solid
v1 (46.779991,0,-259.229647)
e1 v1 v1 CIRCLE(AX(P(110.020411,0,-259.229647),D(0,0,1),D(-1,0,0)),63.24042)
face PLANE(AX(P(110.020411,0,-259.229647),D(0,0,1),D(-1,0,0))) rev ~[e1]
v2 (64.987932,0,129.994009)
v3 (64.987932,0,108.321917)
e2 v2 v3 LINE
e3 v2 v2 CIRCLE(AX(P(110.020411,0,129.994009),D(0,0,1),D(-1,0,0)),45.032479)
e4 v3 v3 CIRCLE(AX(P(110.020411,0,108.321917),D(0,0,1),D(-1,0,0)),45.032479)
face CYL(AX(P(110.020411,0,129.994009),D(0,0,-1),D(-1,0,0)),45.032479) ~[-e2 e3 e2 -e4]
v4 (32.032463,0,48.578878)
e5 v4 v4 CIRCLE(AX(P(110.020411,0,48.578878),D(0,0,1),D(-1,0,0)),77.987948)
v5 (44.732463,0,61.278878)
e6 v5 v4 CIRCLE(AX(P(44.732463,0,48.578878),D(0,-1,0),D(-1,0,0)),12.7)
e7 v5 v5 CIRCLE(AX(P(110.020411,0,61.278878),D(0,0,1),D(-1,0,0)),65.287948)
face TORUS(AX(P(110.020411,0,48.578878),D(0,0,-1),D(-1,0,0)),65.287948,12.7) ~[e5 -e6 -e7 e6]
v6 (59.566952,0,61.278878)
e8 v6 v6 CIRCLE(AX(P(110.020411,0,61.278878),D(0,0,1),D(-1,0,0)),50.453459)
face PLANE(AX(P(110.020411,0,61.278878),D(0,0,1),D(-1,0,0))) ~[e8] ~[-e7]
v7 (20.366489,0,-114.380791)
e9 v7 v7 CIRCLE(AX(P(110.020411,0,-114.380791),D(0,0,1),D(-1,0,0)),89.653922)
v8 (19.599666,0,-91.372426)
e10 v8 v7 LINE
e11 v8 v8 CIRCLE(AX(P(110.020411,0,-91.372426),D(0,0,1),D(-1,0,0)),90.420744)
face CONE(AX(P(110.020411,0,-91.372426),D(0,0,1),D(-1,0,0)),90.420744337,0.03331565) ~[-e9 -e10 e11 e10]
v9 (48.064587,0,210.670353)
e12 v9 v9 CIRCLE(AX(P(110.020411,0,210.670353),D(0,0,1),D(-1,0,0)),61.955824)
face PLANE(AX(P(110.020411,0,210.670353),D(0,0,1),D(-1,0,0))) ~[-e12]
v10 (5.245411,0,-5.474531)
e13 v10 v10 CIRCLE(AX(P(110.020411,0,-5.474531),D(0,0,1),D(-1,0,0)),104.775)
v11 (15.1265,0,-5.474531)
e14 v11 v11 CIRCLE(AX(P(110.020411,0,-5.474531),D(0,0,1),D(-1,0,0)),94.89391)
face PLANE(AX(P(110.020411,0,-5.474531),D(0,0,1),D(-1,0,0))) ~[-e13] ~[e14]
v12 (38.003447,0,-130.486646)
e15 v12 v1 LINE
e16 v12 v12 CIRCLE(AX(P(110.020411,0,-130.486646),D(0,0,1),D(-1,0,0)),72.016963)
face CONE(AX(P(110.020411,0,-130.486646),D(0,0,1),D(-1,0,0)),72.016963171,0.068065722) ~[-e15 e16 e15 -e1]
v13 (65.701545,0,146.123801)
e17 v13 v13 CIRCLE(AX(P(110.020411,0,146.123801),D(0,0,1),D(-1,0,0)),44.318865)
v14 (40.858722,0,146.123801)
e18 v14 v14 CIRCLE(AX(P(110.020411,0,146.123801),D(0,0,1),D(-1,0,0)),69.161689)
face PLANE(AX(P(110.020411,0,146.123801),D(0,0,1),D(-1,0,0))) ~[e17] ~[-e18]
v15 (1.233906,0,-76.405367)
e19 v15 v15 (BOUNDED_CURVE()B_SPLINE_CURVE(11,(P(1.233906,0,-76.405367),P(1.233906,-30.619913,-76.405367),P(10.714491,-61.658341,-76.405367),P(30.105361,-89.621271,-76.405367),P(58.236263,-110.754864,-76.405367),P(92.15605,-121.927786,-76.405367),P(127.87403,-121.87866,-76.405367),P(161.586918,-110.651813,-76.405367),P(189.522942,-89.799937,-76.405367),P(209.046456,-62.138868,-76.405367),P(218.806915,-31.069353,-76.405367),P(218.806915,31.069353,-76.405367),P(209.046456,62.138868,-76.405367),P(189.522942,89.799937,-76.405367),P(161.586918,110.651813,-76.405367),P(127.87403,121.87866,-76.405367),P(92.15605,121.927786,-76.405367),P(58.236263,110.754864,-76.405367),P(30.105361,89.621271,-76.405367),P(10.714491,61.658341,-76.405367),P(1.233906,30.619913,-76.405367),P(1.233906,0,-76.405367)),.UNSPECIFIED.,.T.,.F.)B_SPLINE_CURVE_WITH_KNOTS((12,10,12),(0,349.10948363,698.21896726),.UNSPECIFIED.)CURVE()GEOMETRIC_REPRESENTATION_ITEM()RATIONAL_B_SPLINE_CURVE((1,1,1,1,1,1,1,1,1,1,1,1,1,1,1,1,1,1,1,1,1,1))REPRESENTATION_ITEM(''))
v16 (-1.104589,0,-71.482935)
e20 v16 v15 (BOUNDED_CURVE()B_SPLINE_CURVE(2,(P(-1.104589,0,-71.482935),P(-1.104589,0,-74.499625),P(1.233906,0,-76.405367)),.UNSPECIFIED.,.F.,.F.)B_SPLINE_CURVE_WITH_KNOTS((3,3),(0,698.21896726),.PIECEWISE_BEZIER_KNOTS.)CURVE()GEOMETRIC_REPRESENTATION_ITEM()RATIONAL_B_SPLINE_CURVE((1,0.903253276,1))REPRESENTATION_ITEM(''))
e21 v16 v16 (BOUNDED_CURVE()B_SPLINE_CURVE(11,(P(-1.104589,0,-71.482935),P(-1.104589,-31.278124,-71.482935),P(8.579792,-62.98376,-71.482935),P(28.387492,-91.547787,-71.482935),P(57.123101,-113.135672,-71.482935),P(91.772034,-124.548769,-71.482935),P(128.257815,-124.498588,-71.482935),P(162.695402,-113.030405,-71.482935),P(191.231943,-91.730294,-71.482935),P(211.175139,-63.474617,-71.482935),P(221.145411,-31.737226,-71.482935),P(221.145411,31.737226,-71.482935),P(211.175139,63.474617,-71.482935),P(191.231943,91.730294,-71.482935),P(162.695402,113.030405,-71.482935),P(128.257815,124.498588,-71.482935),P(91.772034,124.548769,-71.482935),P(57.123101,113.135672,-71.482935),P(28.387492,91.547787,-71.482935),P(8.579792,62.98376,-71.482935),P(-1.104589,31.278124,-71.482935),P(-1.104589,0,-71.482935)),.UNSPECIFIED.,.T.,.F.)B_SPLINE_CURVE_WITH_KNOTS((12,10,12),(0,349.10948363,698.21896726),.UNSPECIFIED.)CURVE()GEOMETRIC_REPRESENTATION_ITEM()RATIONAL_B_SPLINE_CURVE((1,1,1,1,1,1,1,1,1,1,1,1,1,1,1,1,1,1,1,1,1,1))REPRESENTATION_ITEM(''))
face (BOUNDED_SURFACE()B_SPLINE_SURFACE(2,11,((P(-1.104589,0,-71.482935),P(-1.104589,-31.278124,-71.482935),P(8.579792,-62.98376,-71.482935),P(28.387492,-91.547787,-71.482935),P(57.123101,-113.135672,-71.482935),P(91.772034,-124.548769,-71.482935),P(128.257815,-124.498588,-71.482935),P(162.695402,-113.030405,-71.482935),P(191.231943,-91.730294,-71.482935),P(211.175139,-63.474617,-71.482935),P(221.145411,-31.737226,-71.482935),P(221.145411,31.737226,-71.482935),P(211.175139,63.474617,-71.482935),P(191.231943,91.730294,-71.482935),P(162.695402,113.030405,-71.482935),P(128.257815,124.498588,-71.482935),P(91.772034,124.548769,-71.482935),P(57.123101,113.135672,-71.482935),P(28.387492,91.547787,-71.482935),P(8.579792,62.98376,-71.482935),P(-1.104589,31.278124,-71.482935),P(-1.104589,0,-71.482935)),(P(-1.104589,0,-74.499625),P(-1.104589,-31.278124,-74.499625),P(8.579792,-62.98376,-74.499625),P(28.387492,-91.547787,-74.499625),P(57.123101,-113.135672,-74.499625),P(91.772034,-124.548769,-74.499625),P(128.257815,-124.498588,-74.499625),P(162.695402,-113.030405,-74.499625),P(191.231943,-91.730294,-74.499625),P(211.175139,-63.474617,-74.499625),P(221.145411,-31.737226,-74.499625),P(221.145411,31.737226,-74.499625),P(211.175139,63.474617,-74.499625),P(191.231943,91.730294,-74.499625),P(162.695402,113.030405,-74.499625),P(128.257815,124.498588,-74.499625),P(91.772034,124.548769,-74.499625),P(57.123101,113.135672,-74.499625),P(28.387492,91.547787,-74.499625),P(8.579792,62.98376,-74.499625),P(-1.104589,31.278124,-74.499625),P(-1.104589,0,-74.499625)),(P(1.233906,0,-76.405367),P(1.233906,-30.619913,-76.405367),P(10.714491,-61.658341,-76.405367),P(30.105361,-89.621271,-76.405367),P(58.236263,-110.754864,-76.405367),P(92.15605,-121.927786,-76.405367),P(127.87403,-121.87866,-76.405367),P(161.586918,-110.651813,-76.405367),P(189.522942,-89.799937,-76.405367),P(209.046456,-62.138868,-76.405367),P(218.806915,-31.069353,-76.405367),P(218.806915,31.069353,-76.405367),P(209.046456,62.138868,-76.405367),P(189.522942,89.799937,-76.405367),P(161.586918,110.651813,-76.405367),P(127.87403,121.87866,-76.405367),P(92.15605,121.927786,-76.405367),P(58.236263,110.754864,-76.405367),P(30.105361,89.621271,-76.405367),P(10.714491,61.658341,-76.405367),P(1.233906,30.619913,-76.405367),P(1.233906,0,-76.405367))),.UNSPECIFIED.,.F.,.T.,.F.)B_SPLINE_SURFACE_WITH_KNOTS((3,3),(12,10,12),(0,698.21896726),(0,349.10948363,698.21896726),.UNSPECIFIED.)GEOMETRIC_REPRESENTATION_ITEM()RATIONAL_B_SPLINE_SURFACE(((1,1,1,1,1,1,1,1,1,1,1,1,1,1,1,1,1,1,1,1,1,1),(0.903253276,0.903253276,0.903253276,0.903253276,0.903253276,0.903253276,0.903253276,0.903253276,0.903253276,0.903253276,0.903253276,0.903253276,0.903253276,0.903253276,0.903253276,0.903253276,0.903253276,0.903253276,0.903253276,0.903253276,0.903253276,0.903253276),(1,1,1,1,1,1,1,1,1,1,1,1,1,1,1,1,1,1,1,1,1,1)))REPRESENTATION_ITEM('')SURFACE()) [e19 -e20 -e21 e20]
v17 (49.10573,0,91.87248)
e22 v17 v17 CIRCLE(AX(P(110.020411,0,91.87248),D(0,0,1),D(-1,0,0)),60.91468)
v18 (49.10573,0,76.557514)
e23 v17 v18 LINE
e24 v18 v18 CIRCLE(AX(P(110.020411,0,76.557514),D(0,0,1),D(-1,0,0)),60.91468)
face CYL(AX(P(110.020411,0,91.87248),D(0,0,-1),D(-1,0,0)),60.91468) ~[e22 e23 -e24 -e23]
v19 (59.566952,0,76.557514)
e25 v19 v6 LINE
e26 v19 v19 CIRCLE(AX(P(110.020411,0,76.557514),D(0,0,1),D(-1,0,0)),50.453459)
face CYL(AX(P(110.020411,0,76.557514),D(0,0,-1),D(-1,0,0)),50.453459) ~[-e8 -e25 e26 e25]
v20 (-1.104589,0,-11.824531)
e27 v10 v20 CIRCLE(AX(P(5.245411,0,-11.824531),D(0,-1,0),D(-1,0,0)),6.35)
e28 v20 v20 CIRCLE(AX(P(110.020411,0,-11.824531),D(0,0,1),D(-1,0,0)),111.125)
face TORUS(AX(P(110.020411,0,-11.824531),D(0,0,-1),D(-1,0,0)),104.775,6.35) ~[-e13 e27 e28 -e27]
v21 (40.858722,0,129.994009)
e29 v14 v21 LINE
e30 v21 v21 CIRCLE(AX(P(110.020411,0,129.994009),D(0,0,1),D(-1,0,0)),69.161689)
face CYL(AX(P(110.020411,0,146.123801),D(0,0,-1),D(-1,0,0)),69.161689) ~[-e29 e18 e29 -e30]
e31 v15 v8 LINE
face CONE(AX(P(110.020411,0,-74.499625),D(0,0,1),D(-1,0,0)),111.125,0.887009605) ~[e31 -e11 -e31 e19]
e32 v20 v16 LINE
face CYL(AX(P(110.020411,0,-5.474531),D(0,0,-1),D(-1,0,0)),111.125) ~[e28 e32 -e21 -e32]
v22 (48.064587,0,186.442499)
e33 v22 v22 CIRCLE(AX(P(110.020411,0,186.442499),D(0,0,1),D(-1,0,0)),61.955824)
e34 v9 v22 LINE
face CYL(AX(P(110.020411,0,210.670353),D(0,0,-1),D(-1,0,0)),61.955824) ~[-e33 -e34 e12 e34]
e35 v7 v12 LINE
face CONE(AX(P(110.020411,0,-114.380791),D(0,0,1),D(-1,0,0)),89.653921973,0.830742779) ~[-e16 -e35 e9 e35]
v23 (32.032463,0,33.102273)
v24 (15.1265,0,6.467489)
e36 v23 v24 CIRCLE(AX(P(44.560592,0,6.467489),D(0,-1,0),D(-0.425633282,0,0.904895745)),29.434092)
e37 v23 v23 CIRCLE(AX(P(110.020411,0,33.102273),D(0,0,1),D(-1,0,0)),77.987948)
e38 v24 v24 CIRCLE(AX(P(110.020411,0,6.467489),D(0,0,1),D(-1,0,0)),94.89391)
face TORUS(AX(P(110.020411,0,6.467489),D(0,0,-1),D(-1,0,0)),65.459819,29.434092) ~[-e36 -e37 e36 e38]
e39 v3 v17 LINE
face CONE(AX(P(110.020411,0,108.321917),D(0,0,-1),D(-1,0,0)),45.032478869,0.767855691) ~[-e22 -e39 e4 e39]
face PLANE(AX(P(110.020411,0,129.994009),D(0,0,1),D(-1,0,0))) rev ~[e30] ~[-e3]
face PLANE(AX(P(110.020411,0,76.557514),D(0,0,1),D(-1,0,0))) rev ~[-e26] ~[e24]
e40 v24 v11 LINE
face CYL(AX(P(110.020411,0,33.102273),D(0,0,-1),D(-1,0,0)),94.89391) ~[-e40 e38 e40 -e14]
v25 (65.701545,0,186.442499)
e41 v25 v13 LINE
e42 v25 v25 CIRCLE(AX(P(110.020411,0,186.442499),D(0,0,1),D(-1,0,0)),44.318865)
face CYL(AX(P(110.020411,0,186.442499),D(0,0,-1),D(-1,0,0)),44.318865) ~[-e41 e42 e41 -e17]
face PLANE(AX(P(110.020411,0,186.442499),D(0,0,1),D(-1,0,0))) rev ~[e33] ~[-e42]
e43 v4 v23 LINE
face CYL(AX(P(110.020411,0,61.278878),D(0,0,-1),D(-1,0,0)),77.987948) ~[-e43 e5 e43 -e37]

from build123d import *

# Parameters (mm, degrees)
F2_R = 12.7
F4_R = 6.35


# Not quite as in the source:
# - a fillet or chamfer that OpenCascade refuses, or shapes differently, is made with other operations: its cross-section is extruded or revolved along the edge and cut away or added


with BuildPart() as f1:
    # F0 (on Front) → F1 (revolve)
    with BuildSketch(Plane.XZ):
        Polygon((46.7799907497, -259.2296465031), (110.0204106454, -259.2296465031), (110.0204106454, 210.6703534969), (48.0645865742, 210.6703534969), (48.0645865742, 186.4424991518), (65.7015453758, 186.4424991518), (65.7015453758, 146.1238006124), (40.8587217282, 146.1238006124), (40.8587217282, 129.9940093533), (64.9879317765, 129.9940093533), (64.9879317765, 108.3219168065), (49.1057302837, 91.8724802611), (49.1057302837, 76.5575138209), (59.5669516537, 76.5575138209), (59.5669516537, 61.2788777338), (32.0324628472, 61.2788777338), (32.0324628472, 33.1022732576), (15.1265001614, 33.1022732576), (15.1265001614, -5.4745311297), (-1.1045893546, -5.4745311297), (-1.1045893546, -74.4996249259), (19.5996663081, -91.3724261251), (20.3664886729, -114.3807911865), (38.0034474745, -130.4866455729), align=None)
    revolve(axis=Axis((110.0204106454, 0, -24.2796465031), (0, 0, 1)))

    # F2
    f2_edges = [f1.edges().sort_by_distance(p)[0] for p in [
        (188.008358, 0, 61.278878),
    ]]
    fillet(f2_edges, radius=F2_R)

    # F3: fillet of radius 29.4340917525 on 1 edges, made by hand

    # F3_s1 → F3_t2 (revolve, cut)
    with BuildSketch(Plane.XZ):
        with BuildLine():
            ThreePointArc((32.0324628472, 33.1022732576), (19.7098388295, 22.2410689464), (15.1265001614, 6.4674888699))
            Line((15.1265001614, 6.4674888699), (15.1265001614, 33.1022732576))
            Line((15.1265001614, 33.1022732576), (32.0324628472, 33.1022732576))
        make_face()
    revolve(axis=Axis((110.0204106454, 0, 33.1022732576), (0, 0, 1)), mode=Mode.SUBTRACT)

    # F4
    f4_edges = [f1.edges().sort_by_distance(p)[0] for p in [
        (221.145411, 0, -5.474531),
        (221.145411, 0, -74.499625),
    ]]
    fillet(f4_edges, radius=F4_R)


solid = f1.part
